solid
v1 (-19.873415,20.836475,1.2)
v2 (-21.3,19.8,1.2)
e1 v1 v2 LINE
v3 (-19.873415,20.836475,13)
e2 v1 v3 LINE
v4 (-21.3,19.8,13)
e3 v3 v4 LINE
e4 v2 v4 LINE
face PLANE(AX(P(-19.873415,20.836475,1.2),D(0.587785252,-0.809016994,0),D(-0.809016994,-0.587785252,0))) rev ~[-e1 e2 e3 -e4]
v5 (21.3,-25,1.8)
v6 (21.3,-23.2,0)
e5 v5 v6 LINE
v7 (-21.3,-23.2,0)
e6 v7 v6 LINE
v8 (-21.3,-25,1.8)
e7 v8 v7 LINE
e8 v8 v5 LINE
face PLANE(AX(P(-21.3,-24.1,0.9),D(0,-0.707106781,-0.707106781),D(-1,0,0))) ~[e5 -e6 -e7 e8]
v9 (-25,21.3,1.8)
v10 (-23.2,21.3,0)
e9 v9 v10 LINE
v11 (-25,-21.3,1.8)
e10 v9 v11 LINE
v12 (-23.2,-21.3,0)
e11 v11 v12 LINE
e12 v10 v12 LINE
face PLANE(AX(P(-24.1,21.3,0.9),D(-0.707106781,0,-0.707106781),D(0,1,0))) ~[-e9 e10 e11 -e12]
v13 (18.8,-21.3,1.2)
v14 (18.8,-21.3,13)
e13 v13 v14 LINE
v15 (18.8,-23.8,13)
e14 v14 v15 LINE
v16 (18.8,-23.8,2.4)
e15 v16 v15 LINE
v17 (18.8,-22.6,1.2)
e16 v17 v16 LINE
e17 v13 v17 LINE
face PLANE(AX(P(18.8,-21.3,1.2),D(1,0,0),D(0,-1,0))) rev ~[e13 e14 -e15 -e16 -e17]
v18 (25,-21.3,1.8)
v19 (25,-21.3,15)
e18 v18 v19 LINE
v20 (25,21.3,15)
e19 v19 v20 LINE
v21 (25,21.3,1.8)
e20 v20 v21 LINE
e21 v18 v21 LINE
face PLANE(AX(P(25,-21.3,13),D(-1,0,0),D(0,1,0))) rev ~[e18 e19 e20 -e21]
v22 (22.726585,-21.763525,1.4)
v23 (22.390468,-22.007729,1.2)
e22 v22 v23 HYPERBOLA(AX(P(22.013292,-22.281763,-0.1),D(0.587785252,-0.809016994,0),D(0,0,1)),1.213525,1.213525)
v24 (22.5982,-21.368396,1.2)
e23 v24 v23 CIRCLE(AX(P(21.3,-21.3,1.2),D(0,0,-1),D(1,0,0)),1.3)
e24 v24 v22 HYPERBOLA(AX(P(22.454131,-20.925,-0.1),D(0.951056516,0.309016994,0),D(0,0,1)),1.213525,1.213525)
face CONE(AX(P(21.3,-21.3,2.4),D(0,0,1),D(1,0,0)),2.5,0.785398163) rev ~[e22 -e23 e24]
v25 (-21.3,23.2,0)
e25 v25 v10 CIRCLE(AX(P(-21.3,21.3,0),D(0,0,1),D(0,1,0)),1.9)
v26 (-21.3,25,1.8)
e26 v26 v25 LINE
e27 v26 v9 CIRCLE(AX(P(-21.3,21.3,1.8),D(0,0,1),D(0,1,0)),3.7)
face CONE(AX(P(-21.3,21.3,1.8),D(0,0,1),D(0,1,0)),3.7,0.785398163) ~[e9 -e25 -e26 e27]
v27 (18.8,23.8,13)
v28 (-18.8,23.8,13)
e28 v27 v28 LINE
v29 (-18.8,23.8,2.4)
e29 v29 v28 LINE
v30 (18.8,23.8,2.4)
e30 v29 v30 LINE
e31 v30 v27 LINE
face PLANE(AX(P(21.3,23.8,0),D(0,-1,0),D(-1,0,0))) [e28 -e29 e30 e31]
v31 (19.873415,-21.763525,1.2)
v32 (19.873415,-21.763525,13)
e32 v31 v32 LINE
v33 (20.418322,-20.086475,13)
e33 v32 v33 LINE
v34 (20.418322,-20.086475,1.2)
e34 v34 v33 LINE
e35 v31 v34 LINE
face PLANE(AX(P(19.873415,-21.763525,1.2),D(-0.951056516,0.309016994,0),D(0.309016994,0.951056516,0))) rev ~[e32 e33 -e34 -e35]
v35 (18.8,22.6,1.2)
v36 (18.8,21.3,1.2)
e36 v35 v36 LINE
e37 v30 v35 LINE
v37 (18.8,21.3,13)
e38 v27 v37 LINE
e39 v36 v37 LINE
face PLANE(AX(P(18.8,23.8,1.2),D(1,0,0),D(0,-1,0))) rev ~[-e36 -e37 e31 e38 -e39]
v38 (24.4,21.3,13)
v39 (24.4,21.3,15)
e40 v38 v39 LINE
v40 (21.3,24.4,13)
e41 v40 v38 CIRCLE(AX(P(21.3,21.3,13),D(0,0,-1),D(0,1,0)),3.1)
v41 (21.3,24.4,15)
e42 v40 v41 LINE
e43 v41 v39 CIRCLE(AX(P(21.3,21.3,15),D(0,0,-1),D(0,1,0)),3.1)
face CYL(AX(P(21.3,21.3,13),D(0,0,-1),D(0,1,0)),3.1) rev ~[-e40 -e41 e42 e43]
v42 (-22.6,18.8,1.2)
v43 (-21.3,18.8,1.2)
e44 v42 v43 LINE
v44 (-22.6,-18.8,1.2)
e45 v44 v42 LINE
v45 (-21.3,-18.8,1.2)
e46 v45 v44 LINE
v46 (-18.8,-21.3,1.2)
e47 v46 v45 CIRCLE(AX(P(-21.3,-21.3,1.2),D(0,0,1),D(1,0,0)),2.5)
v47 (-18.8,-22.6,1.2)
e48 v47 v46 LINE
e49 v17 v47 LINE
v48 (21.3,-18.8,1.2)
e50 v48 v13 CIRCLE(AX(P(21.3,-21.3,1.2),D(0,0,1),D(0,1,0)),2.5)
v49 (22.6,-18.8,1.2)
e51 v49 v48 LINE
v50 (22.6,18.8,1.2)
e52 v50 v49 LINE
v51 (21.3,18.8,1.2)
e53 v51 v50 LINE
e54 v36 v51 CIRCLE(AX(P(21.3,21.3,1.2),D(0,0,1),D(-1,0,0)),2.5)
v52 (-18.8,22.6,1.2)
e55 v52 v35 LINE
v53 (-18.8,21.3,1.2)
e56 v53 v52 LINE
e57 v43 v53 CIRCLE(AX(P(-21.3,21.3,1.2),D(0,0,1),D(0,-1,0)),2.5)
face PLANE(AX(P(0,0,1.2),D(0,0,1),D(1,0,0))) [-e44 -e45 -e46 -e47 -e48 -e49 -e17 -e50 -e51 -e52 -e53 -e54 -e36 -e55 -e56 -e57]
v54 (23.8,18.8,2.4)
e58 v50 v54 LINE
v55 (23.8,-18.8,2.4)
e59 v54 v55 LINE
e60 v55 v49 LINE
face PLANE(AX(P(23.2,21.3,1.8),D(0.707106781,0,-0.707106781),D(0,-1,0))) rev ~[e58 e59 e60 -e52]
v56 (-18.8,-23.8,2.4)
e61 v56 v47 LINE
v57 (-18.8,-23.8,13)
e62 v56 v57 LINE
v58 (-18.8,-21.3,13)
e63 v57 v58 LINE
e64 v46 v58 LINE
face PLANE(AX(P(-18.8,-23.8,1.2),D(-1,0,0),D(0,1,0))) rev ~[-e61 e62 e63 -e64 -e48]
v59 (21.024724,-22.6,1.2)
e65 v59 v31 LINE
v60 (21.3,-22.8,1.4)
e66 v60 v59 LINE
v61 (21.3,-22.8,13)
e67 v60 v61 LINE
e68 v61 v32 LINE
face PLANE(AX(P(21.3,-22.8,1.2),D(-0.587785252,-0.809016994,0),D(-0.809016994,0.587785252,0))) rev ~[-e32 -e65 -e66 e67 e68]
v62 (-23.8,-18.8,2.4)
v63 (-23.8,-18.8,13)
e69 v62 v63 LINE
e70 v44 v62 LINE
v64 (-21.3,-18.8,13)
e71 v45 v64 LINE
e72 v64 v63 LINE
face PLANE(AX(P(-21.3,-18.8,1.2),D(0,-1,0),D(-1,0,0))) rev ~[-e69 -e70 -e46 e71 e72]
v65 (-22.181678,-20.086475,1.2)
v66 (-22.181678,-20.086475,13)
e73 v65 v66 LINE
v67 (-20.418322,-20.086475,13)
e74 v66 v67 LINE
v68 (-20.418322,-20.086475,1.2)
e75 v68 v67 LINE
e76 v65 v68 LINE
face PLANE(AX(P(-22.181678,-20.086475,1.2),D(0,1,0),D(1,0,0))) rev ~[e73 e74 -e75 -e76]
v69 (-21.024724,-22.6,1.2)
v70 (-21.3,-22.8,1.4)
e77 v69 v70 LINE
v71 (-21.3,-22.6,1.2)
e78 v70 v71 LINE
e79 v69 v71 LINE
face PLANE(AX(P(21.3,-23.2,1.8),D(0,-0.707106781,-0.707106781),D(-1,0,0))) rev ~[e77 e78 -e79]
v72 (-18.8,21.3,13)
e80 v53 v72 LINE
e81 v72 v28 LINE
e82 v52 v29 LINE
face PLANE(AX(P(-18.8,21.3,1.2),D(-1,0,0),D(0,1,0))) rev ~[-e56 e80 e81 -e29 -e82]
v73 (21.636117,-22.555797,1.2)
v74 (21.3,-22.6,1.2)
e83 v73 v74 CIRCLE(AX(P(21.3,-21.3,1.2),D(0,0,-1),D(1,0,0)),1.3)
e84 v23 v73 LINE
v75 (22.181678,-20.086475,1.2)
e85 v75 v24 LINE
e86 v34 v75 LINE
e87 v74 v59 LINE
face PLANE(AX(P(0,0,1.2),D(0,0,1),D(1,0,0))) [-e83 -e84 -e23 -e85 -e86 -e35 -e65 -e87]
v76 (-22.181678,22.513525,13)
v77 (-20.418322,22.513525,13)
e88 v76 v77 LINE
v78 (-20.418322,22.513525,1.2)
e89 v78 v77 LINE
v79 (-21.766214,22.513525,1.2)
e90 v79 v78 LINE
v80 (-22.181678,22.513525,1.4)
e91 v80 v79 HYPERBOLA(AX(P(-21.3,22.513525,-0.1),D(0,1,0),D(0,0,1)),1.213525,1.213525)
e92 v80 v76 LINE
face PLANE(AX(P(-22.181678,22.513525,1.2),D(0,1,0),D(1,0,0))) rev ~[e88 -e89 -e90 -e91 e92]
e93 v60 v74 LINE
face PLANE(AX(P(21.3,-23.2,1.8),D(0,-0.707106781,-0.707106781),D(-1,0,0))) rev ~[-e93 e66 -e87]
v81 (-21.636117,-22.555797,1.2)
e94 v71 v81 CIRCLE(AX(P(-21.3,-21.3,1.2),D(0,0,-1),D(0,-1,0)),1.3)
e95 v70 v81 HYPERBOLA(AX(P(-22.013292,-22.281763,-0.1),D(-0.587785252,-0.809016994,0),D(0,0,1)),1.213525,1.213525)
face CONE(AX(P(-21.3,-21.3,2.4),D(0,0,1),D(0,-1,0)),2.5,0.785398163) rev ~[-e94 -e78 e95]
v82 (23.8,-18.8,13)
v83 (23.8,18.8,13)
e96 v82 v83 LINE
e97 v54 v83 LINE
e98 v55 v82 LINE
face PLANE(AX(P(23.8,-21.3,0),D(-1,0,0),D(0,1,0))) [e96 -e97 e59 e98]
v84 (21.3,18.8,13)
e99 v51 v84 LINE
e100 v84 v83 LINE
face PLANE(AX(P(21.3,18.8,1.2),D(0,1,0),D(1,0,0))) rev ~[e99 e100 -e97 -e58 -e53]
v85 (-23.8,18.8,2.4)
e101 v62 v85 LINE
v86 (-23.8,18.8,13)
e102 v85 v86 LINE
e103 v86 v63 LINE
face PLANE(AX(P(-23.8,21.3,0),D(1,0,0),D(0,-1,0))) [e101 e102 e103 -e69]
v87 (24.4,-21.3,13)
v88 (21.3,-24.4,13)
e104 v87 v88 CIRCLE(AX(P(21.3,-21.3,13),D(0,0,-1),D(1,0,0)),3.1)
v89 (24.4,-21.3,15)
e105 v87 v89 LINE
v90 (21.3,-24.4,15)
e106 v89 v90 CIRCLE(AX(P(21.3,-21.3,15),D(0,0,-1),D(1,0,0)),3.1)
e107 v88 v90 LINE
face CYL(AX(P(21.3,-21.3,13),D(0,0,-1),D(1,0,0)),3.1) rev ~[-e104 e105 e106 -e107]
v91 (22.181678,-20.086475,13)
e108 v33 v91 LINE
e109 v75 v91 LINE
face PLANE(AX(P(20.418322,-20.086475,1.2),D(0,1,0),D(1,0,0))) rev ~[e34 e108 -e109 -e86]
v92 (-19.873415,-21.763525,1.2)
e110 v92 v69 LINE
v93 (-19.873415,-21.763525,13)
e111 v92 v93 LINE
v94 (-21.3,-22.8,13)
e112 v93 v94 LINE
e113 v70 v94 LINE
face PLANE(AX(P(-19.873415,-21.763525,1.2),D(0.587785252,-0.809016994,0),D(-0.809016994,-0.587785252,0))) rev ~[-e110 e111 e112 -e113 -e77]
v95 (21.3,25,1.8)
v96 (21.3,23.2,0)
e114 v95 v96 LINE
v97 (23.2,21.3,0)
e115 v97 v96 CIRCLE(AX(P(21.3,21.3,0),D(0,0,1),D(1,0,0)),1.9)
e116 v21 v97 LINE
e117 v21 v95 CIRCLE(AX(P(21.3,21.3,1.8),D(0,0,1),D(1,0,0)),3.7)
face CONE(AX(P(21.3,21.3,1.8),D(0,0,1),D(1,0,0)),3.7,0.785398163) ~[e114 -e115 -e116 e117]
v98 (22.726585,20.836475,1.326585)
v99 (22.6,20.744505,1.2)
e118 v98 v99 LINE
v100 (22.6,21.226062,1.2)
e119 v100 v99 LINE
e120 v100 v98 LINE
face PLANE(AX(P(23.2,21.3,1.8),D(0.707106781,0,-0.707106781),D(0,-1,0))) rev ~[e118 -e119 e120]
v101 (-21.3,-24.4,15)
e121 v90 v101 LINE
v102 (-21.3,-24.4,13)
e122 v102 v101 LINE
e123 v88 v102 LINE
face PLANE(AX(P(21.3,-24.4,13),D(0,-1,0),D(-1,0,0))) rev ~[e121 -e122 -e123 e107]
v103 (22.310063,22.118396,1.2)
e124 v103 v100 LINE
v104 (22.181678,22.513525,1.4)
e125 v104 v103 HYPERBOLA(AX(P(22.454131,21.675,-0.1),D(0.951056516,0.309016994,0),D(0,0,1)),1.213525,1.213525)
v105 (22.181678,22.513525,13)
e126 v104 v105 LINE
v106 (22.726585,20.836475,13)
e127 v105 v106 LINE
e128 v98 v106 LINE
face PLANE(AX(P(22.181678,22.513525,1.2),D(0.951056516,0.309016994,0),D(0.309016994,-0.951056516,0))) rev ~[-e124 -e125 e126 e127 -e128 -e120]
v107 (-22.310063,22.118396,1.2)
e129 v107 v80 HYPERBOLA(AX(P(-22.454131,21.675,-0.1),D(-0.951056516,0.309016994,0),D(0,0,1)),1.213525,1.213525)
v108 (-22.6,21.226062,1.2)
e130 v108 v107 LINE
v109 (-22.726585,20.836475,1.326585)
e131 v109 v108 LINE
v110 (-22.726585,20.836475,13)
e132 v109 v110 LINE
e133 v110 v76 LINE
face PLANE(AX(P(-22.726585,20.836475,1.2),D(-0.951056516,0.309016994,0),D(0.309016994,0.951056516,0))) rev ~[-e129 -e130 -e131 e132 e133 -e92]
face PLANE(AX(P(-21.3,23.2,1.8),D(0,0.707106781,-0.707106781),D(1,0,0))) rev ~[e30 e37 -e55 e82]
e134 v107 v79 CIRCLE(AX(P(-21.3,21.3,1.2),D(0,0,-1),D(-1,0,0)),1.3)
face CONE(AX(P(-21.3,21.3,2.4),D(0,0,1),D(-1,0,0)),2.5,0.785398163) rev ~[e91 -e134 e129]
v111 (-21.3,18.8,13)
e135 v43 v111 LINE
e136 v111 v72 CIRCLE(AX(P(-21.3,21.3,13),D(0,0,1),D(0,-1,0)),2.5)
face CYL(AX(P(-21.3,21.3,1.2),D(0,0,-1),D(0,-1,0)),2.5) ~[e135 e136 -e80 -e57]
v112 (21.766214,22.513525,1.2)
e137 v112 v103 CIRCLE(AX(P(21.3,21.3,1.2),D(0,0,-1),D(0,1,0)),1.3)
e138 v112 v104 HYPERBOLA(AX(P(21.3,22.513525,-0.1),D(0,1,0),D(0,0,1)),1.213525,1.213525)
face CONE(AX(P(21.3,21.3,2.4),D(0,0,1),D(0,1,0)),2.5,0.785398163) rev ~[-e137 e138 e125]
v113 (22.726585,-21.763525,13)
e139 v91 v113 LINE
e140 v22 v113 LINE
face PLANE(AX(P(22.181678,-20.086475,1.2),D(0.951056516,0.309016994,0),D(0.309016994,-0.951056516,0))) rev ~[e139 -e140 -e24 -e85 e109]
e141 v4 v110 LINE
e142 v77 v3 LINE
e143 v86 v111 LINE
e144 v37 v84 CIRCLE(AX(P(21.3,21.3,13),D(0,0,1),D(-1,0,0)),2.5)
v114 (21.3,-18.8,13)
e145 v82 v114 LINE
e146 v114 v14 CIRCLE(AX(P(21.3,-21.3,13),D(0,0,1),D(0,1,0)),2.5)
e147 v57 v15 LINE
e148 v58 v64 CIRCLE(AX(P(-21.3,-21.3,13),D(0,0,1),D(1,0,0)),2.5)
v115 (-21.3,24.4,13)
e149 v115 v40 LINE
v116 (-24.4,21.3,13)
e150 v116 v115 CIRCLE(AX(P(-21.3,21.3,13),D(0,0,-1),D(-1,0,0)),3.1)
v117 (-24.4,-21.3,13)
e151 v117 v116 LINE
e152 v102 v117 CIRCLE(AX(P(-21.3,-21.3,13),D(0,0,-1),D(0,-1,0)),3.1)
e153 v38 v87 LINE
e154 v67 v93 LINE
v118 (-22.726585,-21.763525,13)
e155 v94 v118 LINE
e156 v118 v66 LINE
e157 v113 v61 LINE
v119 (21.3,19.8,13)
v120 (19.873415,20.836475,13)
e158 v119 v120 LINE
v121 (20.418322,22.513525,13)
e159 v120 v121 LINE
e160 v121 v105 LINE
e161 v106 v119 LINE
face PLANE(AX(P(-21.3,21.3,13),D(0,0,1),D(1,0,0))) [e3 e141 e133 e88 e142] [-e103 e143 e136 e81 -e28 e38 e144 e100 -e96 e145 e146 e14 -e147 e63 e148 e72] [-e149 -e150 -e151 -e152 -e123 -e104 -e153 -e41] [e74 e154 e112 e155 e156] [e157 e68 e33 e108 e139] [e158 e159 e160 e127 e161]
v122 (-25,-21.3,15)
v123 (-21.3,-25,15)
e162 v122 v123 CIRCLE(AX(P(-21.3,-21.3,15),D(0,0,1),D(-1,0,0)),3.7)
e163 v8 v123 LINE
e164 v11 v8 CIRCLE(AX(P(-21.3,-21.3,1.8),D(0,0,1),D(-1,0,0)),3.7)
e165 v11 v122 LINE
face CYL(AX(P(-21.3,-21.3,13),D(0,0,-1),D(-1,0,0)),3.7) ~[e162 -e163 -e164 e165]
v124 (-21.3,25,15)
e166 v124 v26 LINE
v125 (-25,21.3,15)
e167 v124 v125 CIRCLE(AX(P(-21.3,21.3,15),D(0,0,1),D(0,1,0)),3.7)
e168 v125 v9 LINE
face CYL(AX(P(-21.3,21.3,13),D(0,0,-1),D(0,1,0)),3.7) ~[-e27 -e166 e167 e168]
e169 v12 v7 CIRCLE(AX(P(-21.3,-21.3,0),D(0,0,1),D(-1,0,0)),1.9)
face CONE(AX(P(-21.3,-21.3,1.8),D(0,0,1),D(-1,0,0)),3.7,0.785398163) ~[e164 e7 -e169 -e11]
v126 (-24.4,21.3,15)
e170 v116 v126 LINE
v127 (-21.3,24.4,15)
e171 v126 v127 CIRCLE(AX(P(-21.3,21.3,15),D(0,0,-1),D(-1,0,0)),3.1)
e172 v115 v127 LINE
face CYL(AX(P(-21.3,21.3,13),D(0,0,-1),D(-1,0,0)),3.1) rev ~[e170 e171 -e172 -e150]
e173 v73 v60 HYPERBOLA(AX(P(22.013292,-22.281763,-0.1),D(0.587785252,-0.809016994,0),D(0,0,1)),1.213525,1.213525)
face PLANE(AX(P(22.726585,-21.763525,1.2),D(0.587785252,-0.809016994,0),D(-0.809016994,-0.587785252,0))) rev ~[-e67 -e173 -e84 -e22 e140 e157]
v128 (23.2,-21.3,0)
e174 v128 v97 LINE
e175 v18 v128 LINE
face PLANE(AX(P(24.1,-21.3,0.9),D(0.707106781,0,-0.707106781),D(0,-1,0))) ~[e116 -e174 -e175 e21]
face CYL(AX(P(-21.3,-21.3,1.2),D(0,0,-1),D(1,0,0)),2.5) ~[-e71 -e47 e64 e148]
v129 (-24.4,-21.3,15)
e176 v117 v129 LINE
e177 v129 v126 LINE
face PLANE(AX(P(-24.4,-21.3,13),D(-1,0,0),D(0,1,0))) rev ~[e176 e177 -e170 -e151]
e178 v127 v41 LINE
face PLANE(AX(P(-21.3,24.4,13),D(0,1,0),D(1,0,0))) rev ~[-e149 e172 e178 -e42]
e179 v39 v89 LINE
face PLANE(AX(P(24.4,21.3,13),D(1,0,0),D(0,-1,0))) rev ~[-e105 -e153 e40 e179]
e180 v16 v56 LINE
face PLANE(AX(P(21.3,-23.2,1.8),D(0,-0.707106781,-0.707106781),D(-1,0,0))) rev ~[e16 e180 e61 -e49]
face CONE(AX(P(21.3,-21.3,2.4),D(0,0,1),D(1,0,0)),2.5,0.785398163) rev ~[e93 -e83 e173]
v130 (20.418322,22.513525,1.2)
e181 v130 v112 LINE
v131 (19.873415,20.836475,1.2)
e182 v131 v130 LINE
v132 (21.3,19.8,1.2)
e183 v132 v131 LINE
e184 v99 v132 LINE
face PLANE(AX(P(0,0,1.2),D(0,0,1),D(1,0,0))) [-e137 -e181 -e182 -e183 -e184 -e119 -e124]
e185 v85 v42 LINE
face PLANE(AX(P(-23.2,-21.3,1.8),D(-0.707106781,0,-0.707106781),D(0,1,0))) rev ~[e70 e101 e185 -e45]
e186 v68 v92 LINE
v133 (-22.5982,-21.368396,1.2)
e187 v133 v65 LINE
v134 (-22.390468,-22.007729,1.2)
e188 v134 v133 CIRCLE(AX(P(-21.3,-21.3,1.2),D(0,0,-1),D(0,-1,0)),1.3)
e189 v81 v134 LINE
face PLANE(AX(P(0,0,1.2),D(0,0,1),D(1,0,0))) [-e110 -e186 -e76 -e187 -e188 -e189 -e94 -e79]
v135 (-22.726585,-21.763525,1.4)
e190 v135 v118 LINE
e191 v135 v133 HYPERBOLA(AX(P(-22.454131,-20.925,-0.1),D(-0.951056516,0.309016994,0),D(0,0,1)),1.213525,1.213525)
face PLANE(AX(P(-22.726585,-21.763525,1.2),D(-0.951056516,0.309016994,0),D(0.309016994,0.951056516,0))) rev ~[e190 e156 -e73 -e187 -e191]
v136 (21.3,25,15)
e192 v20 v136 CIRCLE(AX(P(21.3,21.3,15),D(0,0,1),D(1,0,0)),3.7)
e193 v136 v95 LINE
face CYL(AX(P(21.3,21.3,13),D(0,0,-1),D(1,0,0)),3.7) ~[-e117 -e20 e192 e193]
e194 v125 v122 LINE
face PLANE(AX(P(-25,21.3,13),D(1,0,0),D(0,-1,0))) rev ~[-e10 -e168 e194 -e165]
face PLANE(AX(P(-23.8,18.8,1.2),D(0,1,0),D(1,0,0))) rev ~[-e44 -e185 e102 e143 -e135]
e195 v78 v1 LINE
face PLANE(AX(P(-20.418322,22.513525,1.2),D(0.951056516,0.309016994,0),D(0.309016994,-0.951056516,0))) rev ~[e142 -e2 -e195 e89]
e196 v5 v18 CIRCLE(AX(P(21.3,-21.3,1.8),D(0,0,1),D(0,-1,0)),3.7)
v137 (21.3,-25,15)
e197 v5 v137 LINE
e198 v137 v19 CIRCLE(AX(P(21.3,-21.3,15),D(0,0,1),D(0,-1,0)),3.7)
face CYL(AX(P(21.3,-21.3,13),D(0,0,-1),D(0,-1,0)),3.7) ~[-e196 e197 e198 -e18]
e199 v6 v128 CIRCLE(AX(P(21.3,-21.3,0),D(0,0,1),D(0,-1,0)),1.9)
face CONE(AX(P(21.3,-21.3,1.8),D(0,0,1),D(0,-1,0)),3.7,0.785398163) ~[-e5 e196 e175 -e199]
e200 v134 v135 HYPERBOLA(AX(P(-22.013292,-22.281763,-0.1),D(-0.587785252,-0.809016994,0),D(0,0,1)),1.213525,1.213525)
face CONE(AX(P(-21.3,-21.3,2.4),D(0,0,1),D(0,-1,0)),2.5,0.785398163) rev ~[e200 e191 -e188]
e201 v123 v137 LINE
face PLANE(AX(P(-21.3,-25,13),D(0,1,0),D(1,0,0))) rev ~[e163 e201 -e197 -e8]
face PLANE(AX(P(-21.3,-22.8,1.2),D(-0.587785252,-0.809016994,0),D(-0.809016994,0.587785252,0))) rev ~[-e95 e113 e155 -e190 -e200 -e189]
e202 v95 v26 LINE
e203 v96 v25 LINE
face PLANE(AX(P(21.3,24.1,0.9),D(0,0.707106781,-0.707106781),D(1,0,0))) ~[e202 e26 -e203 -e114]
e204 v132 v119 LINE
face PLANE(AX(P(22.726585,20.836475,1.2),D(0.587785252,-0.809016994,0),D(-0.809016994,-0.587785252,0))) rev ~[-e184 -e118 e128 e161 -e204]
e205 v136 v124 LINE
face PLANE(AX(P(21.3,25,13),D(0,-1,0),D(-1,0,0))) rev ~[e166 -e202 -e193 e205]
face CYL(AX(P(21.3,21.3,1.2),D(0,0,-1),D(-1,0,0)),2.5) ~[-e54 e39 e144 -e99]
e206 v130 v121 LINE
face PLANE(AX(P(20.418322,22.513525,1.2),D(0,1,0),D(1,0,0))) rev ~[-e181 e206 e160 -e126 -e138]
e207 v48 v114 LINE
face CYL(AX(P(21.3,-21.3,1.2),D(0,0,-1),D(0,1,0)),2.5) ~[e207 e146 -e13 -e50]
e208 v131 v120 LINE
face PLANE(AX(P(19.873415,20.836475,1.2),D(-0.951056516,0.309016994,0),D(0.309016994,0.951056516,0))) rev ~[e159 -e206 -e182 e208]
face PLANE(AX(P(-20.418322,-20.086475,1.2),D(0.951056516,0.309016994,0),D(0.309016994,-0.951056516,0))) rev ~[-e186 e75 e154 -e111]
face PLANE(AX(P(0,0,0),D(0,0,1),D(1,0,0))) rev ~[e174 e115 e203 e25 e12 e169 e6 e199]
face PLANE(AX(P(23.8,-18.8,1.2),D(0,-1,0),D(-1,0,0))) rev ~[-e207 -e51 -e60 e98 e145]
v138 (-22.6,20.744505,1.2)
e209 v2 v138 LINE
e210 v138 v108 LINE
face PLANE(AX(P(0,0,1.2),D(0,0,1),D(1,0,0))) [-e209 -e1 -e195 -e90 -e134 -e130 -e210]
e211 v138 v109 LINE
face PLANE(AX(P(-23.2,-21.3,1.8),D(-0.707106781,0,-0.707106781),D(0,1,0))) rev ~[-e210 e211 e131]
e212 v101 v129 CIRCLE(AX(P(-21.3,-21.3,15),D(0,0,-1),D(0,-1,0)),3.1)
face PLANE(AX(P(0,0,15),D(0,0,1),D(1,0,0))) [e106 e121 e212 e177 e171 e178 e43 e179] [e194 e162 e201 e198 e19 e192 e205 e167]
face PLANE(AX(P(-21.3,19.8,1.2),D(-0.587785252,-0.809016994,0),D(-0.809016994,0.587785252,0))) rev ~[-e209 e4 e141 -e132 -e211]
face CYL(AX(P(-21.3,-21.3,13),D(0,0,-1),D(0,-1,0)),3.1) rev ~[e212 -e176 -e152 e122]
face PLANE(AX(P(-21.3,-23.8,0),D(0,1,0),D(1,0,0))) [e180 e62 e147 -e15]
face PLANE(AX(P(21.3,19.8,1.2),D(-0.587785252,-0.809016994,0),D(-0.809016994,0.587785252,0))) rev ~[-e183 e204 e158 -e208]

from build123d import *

# Parameters (mm, degrees)
F3_DEPTH  = 13
F4_T      = -1.2
F6_SIZE   = 1.8
F7_SIZE   = 1.2
F8_DEPTH  = 11.8
F10_DEPTH = 2


# Not quite as in the source:
# - a feature names something its author has since deleted; it is built from what else it names


with BuildPart() as f3:
    # F2 (on Top) → F3 (new body)
    with BuildSketch(Plane.XY):
        with BuildLine():
            ThreePointArc((-25, -21.3), (-23.9162950904, -23.9162950904), (-21.3, -25))
            Line((-21.3, -25), (21.3, -25))
            ThreePointArc((21.3, -25), (23.9162950904, -23.9162950904), (25, -21.3))
            Line((25, -21.3), (25, 21.3))
            ThreePointArc((25, 21.3), (23.9162950904, 23.9162950904), (21.3, 25))
            Line((21.3, 25), (-21.3, 25))
            ThreePointArc((-21.3, 25), (-23.9162950904, 23.9162950904), (-25, 21.3))
            Line((-25, 21.3), (-25, -21.3))
        make_face()
    extrude(amount=F3_DEPTH)

    # F4
    f4_openings = [f3.faces().sort_by_distance(p)[0] for p in [
        (0, 0, 13),
    ]]
    offset(amount=F4_T, openings=f4_openings)

    # F6
    f6_edges = [f3.edges().sort_by_distance(p)[0] for p in [
        (-23.916295, -23.916295, 0),
        (0, -25, 0),
        (23.916295, -23.916295, 0),
        (25, 0, 0),
        (23.916295, 23.916295, 0),
        (0, 25, 0),
        (-23.916295, 23.916295, 0),
        (-25, 0, 0),
    ]]
    chamfer(f6_edges, length=F6_SIZE)

    # F7
    f7_edges = [f3.edges().sort_by_distance(p)[0] for p in [
        (-23.067767, -23.067767, 1.2),
        (0, -23.8, 1.2),
        (23.067767, -23.067767, 1.2),
        (23.8, 0, 1.2),
        (23.067767, 23.067767, 1.2),
        (0, 23.8, 1.2),
        (-23.067767, 23.067767, 1.2),
        (-23.8, 0, 1.2),
    ]]
    chamfer(f7_edges, length=F7_SIZE)

    # F5 (on face) → F8 (join, through all)
    with BuildSketch(Plane.XY.offset(1.2)):
        with BuildLine():
            Line((-23.8, 18.8), (-21.3, 18.8))
            ThreePointArc((-21.3, 18.8), (-19.532233047, 19.532233047), (-18.8, 21.3))
            Line((-18.8, 21.3), (-18.8, 23.8))
            Line((-18.8, 23.8), (-21.3, 23.8))
            ThreePointArc((-21.3, 23.8), (-23.067766953, 23.067766953), (-23.8, 21.3))
            Line((-23.8, 21.3), (-23.8, 18.8))
        make_face()
        Polygon((-19.8734152256, 20.8364745084), (-21.3, 19.8), (-22.7265847744, 20.8364745084), (-22.1816778784, 22.5135254916), (-20.4183221216, 22.5135254916), align=None, mode=Mode.SUBTRACT)
        with BuildLine():
            Line((-21.3, -18.8), (-23.8, -18.8))
            Line((-23.8, -18.8), (-23.8, -21.3))
            ThreePointArc((-23.8, -21.3), (-23.067766953, -23.067766953), (-21.3, -23.8))
            Line((-21.3, -23.8), (-18.8, -23.8))
            Line((-18.8, -23.8), (-18.8, -21.3))
            ThreePointArc((-18.8, -21.3), (-19.532233047, -19.532233047), (-21.3, -18.8))
        make_face()
        Polygon((-22.7265847744, -21.7635254916), (-22.1816778784, -20.0864745084), (-20.4183221216, -20.0864745084), (-19.8734152256, -21.7635254916), (-21.3, -22.8), align=None, mode=Mode.SUBTRACT)
        with BuildLine():
            Line((21.3, 23.8), (18.8, 23.8))
            Line((18.8, 23.8), (18.8, 21.3))
            ThreePointArc((18.8, 21.3), (19.532233047, 19.532233047), (21.3, 18.8))
            Line((21.3, 18.8), (23.8, 18.8))
            Line((23.8, 18.8), (23.8, 21.3))
            ThreePointArc((23.8, 21.3), (23.067766953, 23.067766953), (21.3, 23.8))
        make_face()
        Polygon((19.8734152256, 20.8364745084), (20.4183221216, 22.5135254916), (22.1816778784, 22.5135254916), (22.7265847744, 20.8364745084), (21.3, 19.8), align=None, mode=Mode.SUBTRACT)
        with BuildLine():
            Line((18.8, -21.3), (18.8, -23.8))
            Line((18.8, -23.8), (21.3, -23.8))
            ThreePointArc((21.3, -23.8), (23.067766953, -23.067766953), (23.8, -21.3))
            Line((23.8, -21.3), (23.8, -18.8))
            Line((23.8, -18.8), (21.3, -18.8))
            ThreePointArc((21.3, -18.8), (19.532233047, -19.532233047), (18.8, -21.3))
        make_face()
        Polygon((19.8734152256, -21.7635254916), (20.4183221216, -20.0864745084), (22.1816778784, -20.0864745084), (22.7265847744, -21.7635254916), (21.3, -22.8), align=None, mode=Mode.SUBTRACT)
    extrude(amount=F8_DEPTH)

    # F9 (on face) → F10 (join)
    with BuildSketch(Plane.XY.offset(13)):
        with BuildLine():
            Line((-25, 21.3), (-25, -21.3))
            ThreePointArc((-25, -21.3), (-23.9162950904, -23.9162950904), (-21.3, -25))
            Line((-21.3, -25), (21.3, -25))
            ThreePointArc((21.3, -25), (23.9162950904, -23.9162950904), (25, -21.3))
            Line((25, -21.3), (25, 21.3))
            ThreePointArc((25, 21.3), (23.9162950904, 23.9162950904), (21.3, 25))
            Line((21.3, 25), (-21.3, 25))
            ThreePointArc((-21.3, 25), (-23.9162950904, 23.9162950904), (-25, 21.3))
        make_face()
        with BuildLine():
            ThreePointArc((-24.4, 21.3), (-23.4920310217, 23.4920310217), (-21.3, 24.4))
            Line((-21.3, 24.4), (21.3, 24.4))
            ThreePointArc((21.3, 24.4), (23.4920310217, 23.4920310217), (24.4, 21.3))
            Line((24.4, 21.3), (24.4, -21.3))
            ThreePointArc((24.4, -21.3), (23.4920310217, -23.4920310217), (21.3, -24.4))
            Line((21.3, -24.4), (-21.3, -24.4))
            ThreePointArc((-21.3, -24.4), (-23.4920310217, -23.4920310217), (-24.4, -21.3))
            Line((-24.4, -21.3), (-24.4, 21.3))
        make_face(mode=Mode.SUBTRACT)
    extrude(amount=F10_DEPTH)


solid = f3.part
